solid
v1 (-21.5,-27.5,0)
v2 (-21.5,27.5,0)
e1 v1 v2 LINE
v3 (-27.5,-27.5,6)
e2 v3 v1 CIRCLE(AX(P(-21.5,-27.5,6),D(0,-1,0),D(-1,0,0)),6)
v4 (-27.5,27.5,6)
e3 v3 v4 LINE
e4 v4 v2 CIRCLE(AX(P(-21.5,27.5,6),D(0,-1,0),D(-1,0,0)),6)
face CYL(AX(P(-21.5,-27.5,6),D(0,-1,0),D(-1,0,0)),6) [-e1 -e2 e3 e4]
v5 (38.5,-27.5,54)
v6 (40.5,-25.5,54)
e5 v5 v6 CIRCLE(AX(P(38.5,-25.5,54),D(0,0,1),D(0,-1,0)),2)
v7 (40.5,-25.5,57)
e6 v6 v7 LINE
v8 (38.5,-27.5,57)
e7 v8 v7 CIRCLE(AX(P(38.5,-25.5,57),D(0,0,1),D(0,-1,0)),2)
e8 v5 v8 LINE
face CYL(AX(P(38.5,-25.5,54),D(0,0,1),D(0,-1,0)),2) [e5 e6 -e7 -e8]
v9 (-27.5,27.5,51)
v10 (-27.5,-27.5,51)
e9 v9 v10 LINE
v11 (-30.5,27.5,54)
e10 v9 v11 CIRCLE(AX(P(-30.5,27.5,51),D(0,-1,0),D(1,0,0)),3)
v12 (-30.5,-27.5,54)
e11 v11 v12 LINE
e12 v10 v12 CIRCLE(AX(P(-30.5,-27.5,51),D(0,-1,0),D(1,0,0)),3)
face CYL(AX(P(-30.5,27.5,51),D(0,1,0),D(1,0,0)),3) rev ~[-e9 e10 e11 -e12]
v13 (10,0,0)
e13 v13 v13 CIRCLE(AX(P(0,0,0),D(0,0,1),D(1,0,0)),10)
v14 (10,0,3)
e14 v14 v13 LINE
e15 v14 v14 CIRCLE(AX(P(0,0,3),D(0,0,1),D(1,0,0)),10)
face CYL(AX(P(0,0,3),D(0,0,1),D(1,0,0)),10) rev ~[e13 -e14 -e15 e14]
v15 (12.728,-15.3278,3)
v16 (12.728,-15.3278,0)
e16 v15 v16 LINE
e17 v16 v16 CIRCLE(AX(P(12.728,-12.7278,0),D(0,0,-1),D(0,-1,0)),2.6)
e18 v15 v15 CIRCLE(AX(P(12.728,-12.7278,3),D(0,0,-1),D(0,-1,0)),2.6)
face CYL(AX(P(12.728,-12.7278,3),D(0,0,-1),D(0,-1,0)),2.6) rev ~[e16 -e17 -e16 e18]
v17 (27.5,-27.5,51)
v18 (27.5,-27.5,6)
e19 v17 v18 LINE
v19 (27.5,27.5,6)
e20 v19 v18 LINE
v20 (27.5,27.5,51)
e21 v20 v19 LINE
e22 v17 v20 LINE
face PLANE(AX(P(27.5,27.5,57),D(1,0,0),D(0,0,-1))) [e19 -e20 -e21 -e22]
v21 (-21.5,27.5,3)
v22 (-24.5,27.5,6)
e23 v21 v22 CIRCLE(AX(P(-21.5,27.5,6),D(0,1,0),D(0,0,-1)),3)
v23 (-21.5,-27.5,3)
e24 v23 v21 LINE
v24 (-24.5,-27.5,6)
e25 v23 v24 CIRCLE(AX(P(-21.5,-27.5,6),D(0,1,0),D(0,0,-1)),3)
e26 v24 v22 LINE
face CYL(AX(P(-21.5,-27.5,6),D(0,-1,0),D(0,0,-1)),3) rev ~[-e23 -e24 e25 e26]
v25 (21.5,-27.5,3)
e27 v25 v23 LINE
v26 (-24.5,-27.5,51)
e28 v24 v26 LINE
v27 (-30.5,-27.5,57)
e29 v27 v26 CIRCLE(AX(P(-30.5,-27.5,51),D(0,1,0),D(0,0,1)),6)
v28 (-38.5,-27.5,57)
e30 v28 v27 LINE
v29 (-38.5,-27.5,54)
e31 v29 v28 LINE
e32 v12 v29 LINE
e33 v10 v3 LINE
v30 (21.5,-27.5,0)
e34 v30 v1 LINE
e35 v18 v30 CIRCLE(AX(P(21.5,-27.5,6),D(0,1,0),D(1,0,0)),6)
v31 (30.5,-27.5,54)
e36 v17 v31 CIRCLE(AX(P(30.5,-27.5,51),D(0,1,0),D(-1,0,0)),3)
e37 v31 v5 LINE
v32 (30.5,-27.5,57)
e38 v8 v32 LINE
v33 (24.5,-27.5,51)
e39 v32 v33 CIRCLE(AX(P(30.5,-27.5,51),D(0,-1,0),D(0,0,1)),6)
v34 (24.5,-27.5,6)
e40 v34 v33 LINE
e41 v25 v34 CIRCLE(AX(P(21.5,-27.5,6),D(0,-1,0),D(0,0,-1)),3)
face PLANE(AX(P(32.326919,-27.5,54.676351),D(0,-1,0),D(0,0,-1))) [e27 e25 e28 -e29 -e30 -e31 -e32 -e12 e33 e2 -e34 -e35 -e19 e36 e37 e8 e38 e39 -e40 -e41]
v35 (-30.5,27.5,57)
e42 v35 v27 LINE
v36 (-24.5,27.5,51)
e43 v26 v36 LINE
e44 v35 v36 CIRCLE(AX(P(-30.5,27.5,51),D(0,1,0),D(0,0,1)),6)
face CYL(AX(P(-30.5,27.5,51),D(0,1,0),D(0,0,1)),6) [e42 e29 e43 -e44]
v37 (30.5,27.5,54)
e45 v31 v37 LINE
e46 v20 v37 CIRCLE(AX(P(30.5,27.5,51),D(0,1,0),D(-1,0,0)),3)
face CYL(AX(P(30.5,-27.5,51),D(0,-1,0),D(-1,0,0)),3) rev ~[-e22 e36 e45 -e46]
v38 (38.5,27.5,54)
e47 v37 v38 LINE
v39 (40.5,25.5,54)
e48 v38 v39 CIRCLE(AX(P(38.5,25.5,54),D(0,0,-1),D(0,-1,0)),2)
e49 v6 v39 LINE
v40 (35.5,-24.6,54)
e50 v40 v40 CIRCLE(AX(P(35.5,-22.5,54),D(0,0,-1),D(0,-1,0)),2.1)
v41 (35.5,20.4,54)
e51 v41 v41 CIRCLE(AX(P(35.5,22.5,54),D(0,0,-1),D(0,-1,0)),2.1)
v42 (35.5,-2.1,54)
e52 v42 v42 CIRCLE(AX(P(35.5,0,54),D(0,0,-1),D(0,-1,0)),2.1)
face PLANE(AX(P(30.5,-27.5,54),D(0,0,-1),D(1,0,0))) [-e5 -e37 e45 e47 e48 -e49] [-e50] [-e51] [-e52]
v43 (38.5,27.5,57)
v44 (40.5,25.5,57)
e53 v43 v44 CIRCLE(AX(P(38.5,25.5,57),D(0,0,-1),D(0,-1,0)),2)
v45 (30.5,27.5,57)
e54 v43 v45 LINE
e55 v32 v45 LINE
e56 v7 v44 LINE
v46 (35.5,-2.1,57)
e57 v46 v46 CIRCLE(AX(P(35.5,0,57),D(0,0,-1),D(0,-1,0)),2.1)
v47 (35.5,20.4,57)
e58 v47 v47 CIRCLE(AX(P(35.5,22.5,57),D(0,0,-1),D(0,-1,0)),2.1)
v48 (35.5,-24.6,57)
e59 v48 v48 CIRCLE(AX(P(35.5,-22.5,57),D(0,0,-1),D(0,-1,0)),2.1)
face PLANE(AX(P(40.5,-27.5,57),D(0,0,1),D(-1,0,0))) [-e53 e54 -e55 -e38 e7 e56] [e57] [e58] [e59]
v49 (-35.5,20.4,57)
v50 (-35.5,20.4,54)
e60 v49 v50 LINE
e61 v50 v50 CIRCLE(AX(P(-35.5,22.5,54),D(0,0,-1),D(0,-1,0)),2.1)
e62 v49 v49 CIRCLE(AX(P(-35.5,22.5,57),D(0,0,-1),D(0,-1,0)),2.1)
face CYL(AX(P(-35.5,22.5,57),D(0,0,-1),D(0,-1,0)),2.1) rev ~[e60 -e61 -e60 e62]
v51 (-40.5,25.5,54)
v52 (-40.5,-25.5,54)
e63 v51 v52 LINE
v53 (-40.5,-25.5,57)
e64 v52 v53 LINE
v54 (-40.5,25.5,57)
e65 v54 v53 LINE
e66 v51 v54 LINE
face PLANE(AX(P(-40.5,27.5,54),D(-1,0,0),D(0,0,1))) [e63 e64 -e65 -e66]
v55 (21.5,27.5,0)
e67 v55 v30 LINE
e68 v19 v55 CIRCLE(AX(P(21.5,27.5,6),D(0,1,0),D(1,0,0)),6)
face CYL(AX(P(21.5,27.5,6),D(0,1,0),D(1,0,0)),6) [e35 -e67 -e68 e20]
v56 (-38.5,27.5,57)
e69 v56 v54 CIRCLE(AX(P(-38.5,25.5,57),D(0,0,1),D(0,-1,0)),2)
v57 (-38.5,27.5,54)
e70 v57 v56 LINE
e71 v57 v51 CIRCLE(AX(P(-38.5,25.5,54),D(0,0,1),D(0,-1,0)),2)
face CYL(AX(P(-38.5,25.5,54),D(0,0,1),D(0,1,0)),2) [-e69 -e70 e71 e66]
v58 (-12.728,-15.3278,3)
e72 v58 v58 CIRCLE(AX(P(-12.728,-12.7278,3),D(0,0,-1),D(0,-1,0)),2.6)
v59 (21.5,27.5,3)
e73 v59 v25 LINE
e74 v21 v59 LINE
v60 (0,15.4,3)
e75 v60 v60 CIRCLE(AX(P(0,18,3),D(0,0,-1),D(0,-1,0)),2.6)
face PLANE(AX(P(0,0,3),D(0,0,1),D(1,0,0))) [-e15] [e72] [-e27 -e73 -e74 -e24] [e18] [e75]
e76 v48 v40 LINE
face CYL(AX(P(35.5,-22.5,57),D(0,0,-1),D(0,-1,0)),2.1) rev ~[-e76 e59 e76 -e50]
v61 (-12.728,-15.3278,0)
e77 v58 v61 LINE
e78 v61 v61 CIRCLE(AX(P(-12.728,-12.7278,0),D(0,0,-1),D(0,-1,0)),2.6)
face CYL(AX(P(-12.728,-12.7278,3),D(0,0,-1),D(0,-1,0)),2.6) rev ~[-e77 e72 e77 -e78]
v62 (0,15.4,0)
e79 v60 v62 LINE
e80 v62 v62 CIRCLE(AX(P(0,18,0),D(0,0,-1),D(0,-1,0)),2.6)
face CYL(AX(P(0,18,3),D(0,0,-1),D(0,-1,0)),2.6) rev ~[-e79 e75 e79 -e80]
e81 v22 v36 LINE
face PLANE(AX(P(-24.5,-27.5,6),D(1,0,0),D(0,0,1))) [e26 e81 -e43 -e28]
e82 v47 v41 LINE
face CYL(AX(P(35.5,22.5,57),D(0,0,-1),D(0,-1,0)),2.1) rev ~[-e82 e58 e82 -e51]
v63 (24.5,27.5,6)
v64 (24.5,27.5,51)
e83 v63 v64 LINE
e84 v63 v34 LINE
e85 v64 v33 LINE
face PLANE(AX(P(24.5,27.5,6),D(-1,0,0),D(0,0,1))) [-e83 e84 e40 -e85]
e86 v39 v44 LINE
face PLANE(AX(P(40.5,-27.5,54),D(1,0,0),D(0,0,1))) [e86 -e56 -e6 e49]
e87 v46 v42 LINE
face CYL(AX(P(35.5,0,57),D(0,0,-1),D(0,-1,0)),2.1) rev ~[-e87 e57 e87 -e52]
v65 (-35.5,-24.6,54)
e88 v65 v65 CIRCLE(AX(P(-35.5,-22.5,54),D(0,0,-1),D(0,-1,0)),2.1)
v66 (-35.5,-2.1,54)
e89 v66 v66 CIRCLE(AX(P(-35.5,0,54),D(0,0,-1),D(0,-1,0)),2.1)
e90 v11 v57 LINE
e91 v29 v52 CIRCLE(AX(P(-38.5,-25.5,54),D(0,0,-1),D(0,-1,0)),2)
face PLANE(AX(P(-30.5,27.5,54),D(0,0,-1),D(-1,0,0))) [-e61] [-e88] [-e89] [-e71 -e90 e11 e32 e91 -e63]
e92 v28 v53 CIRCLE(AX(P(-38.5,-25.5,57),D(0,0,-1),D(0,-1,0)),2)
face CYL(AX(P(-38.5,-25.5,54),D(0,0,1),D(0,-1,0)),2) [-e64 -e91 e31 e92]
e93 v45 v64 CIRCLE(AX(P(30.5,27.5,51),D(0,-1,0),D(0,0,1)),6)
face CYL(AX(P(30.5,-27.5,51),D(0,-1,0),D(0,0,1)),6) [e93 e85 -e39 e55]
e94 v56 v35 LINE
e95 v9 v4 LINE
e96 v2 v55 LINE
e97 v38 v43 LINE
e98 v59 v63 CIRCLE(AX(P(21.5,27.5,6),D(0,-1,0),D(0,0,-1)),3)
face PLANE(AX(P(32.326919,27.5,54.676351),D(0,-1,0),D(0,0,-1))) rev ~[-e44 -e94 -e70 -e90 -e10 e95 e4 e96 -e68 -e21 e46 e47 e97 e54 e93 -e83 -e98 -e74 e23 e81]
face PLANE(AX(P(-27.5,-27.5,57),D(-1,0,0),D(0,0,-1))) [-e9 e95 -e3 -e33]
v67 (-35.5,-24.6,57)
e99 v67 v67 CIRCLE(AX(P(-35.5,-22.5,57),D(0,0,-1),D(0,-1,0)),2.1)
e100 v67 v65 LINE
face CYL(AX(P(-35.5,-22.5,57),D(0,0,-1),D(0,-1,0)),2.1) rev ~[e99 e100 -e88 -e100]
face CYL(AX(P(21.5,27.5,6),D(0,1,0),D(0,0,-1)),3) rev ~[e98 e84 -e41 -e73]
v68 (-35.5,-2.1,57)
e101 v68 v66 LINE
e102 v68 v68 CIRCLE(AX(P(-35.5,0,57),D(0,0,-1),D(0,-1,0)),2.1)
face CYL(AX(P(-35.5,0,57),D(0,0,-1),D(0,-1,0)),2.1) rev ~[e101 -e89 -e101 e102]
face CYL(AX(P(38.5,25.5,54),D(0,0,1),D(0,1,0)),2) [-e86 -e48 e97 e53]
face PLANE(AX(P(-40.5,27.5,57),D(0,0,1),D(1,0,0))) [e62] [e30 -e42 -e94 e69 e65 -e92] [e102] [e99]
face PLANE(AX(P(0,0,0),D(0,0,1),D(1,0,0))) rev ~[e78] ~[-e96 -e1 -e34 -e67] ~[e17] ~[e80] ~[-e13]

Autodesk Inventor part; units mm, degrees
ref_plane "YZ Plane" through (0, 0, 0) normal (1, 0, 0) x (0, 1, 0)
ref_plane "XZ Plane" through (0, 0, 0) normal (0, 1, 0) x (-1, 0, 0)
ref_plane "XY Plane" through (0, 0, 0) normal (0, 0, 1) x (1, 0, 0)
sketch "スケッチ1" plane through (0, 0, 0) normal (0, 0, 1) x (1, 0, 0)
  line L0 (27.5, -27.5) -> (-27.5, -27.5)
  line L1 (-27.5, -27.5) -> (-27.5, 27.5)
  line L2 (-27.5, 27.5) -> (27.5, 27.5)
  line L3 (27.5, 27.5) -> (27.5, -27.5)
  line L4 (27.5, -27.5) -> (-27.5, 27.5) construction
  line L5 (-27.5, -27.5) -> (27.5, 27.5) construction
  point P0 (0, 0)
  dimension "d0" = 55
  dimension "d1" = 55
extrude "プレート1" add sketch "スケッチ1" along normal blind 3
sketch "スケッチ2" plane through (0, 0, 3) normal (0, 0, 1) x (1, 0, 0)
  line L0 (-27.5, -27.5) -> (-27.5, 27.5) projected
  line L1 (27.5, -27.5) -> (-27.5, -27.5) projected
  line L2 (27.5, 27.5) -> (27.5, -27.5) projected
  line L3 (-27.5, 27.5) -> (27.5, 27.5) projected
  circle A0 centre (0, 0) radius 18
  point P0 (0, 18)
  point P1 (-18, 0)
  point P2 (0, -18)
  point P3 (18, 0)
  point P4 (-12.728, -12.7278)
  point P5 (12.728, -12.7278)
  dimension "d3" = 36
  dimension "d54" = 25.456
hole "穴1" at (0, 18, 3) at (12.728, -12.7278, 3) at (-12.728, -12.7278, 3) direction (0, 0, -1) diameter 5.2 end through all
sketch "スケッチ3" plane through (0, 0, 3) normal (0, 0, 1) x (1, 0, 0)
  circle A0 centre (0, 0) radius 10
  dimension "d15" = 20
extrude "押し出し1" cut sketch "スケッチ3" against normal blind 10
sketch "スケッチ4" plane through (-24.5, -27.5, 0) normal (-1, 0, 0) x (0, -1, 0)
  line L0 (-55, 0) -> (0, 0)
  line L1 (0, 0) -> (0, 57)
  line L2 (0, 57) -> (-55, 57)
  line L3 (-55, 57) -> (-55, 0)
edge flange "フランジ1" height 57 angle 90 thickness 3 bend radius 3 thickness toward (-1, 0, 0) relief tear relief width 3 relief depth 1.5 corner gap 3 corner form 0 edges at (-27.5, 0, 3) (27.5, 0, 3) wall of the first edge with corners at (-24.5, 27.5, 0) (-24.5, -27.5, 0) (-24.5, -27.5, 57) (-24.5, 27.5, 57)
bend "曲げ1"
corner "コーナー1"
sketch "スケッチ5" plane through (24.5, -27.5, 54) normal (0, 0, 1) x (1, 0, 0)
  line L0 (0, 55) -> (0, 0)
  line L1 (0, 0) -> (16, 0)
  line L2 (16, 0) -> (16, 55)
  line L3 (16, 55) -> (0, 55)
edge flange "フランジ2" height 16 angle 90 thickness 3 bend radius 3 thickness toward (0, 0, 1) relief tear relief width 3 relief depth 1.5 corner gap 3 corner form 0 edges at (27.5, 0, 57) (-27.5, 0, 57) wall of the first edge with corners at (24.5, 27.5, 54) (24.5, -27.5, 54) (40.5, -27.5, 54) (40.5, 27.5, 54)
bend "曲げ2"
corner "コーナー2"
fillet "フィレット1" radius 2 4 edges at (40.5, 27.5, 55.5) (40.5, -27.5, 55.5) (-40.5, -27.5, 55.5) (-40.5, 27.5, 55.5)
sketch "スケッチ8" plane through (-30.5, -27.5, 57) normal (0, 0, 1) x (1, 0, 0)
  arc A0 (-8, 55) -> (-10, 53) centre (-8, 53) ccw projected
  line L0 (-10, 2) -> (-10, 53) projected
  arc A1 (-10, 2) -> (-8, 0) centre (-8, 2) ccw projected
  line L1 (0, 0) -> (-8, 0) projected
  line L2 (0, 0) -> (0, 55) projected
  line L3 (-8, 55) -> (0, 55) projected
  arc A2 (69, 0) -> (71, 2) centre (69, 2) ccw projected
  line L4 (71, 53) -> (71, 2) projected
  arc A3 (71, 53) -> (69, 55) centre (69, 53) ccw projected
  line L5 (61, 55) -> (69, 55) projected
  line L6 (61, 55) -> (61, 0) projected
  line L7 (69, 0) -> (61, 0) projected
  line L8 (-5, 50) -> (66, 50)
  line L9 (66, 50) -> (66, 5)
  line L10 (66, 5) -> (-5, 5)
  line L11 (-5, 5) -> (-5, 50)
  point P0 (30.5, 27.5)
  point P1 (-5, 27.5)
  point P2 (66, 27.5)
  dimension "d55" = 5
  dimension "d56" = 5
  dimension "d57" = 5
  dimension "d58" = 5
hole "穴3" at (-35.5, 0, 57) at (35.5, 0, 57) at (-35.5, -22.5, 57) at (-35.5, 22.5, 57) at (35.5, -22.5, 57) at (35.5, 22.5, 57) direction (0, 0, -1) diameter 4.2 end through all
equation "\"d13\" = Thickness"
equation "\"d64\" = Thickness"
equation "\"d2\" = Thickness"
equation "\"d18\" = BendReliefWidth"
equation "\"d19\" = BendReliefDepth"
equation "\"d20\" = MinimumRemnant"
equation "\"d21\" = TransitionRadius"
equation "\"d24\" = BendRadius"
equation "\"d25\" = CornerReliefSize"
equation "\"d26\" = GapSize"
equation "\"d27\" = JacobiRadiusSize"
equation "\"d28\" = BendReliefWidth"
equation "\"d29\" = BendReliefDepth"
equation "\"d30\" = MinimumRemnant"
equation "\"d31\" = TransitionRadius"
equation "\"d34\" = BendRadius"
equation "\"d35\" = CornerReliefSize"
equation "\"d36\" = GapSize"
equation "\"d37\" = JacobiRadiusSize"
equation "\"BendRadius\" = Thickness"
equation "\"BendReliefWidth\" = Thickness"
equation "\"BendReliefDepth\" = 0.5 * Thickness"
equation "\"CornerReliefSize\" = 4 * Thickness"
equation "\"MinimumRemnant\" = 2 * Thickness"
equation "\"TransitionRadius\" = BendRadius"
equation "\"JacobiRadiusSize\" = BendRadius"
equation "\"GapSize\" = Thickness"
equation "\"Thickness\" = 3"
properties part number "CCM_Motor_Mount_A"
